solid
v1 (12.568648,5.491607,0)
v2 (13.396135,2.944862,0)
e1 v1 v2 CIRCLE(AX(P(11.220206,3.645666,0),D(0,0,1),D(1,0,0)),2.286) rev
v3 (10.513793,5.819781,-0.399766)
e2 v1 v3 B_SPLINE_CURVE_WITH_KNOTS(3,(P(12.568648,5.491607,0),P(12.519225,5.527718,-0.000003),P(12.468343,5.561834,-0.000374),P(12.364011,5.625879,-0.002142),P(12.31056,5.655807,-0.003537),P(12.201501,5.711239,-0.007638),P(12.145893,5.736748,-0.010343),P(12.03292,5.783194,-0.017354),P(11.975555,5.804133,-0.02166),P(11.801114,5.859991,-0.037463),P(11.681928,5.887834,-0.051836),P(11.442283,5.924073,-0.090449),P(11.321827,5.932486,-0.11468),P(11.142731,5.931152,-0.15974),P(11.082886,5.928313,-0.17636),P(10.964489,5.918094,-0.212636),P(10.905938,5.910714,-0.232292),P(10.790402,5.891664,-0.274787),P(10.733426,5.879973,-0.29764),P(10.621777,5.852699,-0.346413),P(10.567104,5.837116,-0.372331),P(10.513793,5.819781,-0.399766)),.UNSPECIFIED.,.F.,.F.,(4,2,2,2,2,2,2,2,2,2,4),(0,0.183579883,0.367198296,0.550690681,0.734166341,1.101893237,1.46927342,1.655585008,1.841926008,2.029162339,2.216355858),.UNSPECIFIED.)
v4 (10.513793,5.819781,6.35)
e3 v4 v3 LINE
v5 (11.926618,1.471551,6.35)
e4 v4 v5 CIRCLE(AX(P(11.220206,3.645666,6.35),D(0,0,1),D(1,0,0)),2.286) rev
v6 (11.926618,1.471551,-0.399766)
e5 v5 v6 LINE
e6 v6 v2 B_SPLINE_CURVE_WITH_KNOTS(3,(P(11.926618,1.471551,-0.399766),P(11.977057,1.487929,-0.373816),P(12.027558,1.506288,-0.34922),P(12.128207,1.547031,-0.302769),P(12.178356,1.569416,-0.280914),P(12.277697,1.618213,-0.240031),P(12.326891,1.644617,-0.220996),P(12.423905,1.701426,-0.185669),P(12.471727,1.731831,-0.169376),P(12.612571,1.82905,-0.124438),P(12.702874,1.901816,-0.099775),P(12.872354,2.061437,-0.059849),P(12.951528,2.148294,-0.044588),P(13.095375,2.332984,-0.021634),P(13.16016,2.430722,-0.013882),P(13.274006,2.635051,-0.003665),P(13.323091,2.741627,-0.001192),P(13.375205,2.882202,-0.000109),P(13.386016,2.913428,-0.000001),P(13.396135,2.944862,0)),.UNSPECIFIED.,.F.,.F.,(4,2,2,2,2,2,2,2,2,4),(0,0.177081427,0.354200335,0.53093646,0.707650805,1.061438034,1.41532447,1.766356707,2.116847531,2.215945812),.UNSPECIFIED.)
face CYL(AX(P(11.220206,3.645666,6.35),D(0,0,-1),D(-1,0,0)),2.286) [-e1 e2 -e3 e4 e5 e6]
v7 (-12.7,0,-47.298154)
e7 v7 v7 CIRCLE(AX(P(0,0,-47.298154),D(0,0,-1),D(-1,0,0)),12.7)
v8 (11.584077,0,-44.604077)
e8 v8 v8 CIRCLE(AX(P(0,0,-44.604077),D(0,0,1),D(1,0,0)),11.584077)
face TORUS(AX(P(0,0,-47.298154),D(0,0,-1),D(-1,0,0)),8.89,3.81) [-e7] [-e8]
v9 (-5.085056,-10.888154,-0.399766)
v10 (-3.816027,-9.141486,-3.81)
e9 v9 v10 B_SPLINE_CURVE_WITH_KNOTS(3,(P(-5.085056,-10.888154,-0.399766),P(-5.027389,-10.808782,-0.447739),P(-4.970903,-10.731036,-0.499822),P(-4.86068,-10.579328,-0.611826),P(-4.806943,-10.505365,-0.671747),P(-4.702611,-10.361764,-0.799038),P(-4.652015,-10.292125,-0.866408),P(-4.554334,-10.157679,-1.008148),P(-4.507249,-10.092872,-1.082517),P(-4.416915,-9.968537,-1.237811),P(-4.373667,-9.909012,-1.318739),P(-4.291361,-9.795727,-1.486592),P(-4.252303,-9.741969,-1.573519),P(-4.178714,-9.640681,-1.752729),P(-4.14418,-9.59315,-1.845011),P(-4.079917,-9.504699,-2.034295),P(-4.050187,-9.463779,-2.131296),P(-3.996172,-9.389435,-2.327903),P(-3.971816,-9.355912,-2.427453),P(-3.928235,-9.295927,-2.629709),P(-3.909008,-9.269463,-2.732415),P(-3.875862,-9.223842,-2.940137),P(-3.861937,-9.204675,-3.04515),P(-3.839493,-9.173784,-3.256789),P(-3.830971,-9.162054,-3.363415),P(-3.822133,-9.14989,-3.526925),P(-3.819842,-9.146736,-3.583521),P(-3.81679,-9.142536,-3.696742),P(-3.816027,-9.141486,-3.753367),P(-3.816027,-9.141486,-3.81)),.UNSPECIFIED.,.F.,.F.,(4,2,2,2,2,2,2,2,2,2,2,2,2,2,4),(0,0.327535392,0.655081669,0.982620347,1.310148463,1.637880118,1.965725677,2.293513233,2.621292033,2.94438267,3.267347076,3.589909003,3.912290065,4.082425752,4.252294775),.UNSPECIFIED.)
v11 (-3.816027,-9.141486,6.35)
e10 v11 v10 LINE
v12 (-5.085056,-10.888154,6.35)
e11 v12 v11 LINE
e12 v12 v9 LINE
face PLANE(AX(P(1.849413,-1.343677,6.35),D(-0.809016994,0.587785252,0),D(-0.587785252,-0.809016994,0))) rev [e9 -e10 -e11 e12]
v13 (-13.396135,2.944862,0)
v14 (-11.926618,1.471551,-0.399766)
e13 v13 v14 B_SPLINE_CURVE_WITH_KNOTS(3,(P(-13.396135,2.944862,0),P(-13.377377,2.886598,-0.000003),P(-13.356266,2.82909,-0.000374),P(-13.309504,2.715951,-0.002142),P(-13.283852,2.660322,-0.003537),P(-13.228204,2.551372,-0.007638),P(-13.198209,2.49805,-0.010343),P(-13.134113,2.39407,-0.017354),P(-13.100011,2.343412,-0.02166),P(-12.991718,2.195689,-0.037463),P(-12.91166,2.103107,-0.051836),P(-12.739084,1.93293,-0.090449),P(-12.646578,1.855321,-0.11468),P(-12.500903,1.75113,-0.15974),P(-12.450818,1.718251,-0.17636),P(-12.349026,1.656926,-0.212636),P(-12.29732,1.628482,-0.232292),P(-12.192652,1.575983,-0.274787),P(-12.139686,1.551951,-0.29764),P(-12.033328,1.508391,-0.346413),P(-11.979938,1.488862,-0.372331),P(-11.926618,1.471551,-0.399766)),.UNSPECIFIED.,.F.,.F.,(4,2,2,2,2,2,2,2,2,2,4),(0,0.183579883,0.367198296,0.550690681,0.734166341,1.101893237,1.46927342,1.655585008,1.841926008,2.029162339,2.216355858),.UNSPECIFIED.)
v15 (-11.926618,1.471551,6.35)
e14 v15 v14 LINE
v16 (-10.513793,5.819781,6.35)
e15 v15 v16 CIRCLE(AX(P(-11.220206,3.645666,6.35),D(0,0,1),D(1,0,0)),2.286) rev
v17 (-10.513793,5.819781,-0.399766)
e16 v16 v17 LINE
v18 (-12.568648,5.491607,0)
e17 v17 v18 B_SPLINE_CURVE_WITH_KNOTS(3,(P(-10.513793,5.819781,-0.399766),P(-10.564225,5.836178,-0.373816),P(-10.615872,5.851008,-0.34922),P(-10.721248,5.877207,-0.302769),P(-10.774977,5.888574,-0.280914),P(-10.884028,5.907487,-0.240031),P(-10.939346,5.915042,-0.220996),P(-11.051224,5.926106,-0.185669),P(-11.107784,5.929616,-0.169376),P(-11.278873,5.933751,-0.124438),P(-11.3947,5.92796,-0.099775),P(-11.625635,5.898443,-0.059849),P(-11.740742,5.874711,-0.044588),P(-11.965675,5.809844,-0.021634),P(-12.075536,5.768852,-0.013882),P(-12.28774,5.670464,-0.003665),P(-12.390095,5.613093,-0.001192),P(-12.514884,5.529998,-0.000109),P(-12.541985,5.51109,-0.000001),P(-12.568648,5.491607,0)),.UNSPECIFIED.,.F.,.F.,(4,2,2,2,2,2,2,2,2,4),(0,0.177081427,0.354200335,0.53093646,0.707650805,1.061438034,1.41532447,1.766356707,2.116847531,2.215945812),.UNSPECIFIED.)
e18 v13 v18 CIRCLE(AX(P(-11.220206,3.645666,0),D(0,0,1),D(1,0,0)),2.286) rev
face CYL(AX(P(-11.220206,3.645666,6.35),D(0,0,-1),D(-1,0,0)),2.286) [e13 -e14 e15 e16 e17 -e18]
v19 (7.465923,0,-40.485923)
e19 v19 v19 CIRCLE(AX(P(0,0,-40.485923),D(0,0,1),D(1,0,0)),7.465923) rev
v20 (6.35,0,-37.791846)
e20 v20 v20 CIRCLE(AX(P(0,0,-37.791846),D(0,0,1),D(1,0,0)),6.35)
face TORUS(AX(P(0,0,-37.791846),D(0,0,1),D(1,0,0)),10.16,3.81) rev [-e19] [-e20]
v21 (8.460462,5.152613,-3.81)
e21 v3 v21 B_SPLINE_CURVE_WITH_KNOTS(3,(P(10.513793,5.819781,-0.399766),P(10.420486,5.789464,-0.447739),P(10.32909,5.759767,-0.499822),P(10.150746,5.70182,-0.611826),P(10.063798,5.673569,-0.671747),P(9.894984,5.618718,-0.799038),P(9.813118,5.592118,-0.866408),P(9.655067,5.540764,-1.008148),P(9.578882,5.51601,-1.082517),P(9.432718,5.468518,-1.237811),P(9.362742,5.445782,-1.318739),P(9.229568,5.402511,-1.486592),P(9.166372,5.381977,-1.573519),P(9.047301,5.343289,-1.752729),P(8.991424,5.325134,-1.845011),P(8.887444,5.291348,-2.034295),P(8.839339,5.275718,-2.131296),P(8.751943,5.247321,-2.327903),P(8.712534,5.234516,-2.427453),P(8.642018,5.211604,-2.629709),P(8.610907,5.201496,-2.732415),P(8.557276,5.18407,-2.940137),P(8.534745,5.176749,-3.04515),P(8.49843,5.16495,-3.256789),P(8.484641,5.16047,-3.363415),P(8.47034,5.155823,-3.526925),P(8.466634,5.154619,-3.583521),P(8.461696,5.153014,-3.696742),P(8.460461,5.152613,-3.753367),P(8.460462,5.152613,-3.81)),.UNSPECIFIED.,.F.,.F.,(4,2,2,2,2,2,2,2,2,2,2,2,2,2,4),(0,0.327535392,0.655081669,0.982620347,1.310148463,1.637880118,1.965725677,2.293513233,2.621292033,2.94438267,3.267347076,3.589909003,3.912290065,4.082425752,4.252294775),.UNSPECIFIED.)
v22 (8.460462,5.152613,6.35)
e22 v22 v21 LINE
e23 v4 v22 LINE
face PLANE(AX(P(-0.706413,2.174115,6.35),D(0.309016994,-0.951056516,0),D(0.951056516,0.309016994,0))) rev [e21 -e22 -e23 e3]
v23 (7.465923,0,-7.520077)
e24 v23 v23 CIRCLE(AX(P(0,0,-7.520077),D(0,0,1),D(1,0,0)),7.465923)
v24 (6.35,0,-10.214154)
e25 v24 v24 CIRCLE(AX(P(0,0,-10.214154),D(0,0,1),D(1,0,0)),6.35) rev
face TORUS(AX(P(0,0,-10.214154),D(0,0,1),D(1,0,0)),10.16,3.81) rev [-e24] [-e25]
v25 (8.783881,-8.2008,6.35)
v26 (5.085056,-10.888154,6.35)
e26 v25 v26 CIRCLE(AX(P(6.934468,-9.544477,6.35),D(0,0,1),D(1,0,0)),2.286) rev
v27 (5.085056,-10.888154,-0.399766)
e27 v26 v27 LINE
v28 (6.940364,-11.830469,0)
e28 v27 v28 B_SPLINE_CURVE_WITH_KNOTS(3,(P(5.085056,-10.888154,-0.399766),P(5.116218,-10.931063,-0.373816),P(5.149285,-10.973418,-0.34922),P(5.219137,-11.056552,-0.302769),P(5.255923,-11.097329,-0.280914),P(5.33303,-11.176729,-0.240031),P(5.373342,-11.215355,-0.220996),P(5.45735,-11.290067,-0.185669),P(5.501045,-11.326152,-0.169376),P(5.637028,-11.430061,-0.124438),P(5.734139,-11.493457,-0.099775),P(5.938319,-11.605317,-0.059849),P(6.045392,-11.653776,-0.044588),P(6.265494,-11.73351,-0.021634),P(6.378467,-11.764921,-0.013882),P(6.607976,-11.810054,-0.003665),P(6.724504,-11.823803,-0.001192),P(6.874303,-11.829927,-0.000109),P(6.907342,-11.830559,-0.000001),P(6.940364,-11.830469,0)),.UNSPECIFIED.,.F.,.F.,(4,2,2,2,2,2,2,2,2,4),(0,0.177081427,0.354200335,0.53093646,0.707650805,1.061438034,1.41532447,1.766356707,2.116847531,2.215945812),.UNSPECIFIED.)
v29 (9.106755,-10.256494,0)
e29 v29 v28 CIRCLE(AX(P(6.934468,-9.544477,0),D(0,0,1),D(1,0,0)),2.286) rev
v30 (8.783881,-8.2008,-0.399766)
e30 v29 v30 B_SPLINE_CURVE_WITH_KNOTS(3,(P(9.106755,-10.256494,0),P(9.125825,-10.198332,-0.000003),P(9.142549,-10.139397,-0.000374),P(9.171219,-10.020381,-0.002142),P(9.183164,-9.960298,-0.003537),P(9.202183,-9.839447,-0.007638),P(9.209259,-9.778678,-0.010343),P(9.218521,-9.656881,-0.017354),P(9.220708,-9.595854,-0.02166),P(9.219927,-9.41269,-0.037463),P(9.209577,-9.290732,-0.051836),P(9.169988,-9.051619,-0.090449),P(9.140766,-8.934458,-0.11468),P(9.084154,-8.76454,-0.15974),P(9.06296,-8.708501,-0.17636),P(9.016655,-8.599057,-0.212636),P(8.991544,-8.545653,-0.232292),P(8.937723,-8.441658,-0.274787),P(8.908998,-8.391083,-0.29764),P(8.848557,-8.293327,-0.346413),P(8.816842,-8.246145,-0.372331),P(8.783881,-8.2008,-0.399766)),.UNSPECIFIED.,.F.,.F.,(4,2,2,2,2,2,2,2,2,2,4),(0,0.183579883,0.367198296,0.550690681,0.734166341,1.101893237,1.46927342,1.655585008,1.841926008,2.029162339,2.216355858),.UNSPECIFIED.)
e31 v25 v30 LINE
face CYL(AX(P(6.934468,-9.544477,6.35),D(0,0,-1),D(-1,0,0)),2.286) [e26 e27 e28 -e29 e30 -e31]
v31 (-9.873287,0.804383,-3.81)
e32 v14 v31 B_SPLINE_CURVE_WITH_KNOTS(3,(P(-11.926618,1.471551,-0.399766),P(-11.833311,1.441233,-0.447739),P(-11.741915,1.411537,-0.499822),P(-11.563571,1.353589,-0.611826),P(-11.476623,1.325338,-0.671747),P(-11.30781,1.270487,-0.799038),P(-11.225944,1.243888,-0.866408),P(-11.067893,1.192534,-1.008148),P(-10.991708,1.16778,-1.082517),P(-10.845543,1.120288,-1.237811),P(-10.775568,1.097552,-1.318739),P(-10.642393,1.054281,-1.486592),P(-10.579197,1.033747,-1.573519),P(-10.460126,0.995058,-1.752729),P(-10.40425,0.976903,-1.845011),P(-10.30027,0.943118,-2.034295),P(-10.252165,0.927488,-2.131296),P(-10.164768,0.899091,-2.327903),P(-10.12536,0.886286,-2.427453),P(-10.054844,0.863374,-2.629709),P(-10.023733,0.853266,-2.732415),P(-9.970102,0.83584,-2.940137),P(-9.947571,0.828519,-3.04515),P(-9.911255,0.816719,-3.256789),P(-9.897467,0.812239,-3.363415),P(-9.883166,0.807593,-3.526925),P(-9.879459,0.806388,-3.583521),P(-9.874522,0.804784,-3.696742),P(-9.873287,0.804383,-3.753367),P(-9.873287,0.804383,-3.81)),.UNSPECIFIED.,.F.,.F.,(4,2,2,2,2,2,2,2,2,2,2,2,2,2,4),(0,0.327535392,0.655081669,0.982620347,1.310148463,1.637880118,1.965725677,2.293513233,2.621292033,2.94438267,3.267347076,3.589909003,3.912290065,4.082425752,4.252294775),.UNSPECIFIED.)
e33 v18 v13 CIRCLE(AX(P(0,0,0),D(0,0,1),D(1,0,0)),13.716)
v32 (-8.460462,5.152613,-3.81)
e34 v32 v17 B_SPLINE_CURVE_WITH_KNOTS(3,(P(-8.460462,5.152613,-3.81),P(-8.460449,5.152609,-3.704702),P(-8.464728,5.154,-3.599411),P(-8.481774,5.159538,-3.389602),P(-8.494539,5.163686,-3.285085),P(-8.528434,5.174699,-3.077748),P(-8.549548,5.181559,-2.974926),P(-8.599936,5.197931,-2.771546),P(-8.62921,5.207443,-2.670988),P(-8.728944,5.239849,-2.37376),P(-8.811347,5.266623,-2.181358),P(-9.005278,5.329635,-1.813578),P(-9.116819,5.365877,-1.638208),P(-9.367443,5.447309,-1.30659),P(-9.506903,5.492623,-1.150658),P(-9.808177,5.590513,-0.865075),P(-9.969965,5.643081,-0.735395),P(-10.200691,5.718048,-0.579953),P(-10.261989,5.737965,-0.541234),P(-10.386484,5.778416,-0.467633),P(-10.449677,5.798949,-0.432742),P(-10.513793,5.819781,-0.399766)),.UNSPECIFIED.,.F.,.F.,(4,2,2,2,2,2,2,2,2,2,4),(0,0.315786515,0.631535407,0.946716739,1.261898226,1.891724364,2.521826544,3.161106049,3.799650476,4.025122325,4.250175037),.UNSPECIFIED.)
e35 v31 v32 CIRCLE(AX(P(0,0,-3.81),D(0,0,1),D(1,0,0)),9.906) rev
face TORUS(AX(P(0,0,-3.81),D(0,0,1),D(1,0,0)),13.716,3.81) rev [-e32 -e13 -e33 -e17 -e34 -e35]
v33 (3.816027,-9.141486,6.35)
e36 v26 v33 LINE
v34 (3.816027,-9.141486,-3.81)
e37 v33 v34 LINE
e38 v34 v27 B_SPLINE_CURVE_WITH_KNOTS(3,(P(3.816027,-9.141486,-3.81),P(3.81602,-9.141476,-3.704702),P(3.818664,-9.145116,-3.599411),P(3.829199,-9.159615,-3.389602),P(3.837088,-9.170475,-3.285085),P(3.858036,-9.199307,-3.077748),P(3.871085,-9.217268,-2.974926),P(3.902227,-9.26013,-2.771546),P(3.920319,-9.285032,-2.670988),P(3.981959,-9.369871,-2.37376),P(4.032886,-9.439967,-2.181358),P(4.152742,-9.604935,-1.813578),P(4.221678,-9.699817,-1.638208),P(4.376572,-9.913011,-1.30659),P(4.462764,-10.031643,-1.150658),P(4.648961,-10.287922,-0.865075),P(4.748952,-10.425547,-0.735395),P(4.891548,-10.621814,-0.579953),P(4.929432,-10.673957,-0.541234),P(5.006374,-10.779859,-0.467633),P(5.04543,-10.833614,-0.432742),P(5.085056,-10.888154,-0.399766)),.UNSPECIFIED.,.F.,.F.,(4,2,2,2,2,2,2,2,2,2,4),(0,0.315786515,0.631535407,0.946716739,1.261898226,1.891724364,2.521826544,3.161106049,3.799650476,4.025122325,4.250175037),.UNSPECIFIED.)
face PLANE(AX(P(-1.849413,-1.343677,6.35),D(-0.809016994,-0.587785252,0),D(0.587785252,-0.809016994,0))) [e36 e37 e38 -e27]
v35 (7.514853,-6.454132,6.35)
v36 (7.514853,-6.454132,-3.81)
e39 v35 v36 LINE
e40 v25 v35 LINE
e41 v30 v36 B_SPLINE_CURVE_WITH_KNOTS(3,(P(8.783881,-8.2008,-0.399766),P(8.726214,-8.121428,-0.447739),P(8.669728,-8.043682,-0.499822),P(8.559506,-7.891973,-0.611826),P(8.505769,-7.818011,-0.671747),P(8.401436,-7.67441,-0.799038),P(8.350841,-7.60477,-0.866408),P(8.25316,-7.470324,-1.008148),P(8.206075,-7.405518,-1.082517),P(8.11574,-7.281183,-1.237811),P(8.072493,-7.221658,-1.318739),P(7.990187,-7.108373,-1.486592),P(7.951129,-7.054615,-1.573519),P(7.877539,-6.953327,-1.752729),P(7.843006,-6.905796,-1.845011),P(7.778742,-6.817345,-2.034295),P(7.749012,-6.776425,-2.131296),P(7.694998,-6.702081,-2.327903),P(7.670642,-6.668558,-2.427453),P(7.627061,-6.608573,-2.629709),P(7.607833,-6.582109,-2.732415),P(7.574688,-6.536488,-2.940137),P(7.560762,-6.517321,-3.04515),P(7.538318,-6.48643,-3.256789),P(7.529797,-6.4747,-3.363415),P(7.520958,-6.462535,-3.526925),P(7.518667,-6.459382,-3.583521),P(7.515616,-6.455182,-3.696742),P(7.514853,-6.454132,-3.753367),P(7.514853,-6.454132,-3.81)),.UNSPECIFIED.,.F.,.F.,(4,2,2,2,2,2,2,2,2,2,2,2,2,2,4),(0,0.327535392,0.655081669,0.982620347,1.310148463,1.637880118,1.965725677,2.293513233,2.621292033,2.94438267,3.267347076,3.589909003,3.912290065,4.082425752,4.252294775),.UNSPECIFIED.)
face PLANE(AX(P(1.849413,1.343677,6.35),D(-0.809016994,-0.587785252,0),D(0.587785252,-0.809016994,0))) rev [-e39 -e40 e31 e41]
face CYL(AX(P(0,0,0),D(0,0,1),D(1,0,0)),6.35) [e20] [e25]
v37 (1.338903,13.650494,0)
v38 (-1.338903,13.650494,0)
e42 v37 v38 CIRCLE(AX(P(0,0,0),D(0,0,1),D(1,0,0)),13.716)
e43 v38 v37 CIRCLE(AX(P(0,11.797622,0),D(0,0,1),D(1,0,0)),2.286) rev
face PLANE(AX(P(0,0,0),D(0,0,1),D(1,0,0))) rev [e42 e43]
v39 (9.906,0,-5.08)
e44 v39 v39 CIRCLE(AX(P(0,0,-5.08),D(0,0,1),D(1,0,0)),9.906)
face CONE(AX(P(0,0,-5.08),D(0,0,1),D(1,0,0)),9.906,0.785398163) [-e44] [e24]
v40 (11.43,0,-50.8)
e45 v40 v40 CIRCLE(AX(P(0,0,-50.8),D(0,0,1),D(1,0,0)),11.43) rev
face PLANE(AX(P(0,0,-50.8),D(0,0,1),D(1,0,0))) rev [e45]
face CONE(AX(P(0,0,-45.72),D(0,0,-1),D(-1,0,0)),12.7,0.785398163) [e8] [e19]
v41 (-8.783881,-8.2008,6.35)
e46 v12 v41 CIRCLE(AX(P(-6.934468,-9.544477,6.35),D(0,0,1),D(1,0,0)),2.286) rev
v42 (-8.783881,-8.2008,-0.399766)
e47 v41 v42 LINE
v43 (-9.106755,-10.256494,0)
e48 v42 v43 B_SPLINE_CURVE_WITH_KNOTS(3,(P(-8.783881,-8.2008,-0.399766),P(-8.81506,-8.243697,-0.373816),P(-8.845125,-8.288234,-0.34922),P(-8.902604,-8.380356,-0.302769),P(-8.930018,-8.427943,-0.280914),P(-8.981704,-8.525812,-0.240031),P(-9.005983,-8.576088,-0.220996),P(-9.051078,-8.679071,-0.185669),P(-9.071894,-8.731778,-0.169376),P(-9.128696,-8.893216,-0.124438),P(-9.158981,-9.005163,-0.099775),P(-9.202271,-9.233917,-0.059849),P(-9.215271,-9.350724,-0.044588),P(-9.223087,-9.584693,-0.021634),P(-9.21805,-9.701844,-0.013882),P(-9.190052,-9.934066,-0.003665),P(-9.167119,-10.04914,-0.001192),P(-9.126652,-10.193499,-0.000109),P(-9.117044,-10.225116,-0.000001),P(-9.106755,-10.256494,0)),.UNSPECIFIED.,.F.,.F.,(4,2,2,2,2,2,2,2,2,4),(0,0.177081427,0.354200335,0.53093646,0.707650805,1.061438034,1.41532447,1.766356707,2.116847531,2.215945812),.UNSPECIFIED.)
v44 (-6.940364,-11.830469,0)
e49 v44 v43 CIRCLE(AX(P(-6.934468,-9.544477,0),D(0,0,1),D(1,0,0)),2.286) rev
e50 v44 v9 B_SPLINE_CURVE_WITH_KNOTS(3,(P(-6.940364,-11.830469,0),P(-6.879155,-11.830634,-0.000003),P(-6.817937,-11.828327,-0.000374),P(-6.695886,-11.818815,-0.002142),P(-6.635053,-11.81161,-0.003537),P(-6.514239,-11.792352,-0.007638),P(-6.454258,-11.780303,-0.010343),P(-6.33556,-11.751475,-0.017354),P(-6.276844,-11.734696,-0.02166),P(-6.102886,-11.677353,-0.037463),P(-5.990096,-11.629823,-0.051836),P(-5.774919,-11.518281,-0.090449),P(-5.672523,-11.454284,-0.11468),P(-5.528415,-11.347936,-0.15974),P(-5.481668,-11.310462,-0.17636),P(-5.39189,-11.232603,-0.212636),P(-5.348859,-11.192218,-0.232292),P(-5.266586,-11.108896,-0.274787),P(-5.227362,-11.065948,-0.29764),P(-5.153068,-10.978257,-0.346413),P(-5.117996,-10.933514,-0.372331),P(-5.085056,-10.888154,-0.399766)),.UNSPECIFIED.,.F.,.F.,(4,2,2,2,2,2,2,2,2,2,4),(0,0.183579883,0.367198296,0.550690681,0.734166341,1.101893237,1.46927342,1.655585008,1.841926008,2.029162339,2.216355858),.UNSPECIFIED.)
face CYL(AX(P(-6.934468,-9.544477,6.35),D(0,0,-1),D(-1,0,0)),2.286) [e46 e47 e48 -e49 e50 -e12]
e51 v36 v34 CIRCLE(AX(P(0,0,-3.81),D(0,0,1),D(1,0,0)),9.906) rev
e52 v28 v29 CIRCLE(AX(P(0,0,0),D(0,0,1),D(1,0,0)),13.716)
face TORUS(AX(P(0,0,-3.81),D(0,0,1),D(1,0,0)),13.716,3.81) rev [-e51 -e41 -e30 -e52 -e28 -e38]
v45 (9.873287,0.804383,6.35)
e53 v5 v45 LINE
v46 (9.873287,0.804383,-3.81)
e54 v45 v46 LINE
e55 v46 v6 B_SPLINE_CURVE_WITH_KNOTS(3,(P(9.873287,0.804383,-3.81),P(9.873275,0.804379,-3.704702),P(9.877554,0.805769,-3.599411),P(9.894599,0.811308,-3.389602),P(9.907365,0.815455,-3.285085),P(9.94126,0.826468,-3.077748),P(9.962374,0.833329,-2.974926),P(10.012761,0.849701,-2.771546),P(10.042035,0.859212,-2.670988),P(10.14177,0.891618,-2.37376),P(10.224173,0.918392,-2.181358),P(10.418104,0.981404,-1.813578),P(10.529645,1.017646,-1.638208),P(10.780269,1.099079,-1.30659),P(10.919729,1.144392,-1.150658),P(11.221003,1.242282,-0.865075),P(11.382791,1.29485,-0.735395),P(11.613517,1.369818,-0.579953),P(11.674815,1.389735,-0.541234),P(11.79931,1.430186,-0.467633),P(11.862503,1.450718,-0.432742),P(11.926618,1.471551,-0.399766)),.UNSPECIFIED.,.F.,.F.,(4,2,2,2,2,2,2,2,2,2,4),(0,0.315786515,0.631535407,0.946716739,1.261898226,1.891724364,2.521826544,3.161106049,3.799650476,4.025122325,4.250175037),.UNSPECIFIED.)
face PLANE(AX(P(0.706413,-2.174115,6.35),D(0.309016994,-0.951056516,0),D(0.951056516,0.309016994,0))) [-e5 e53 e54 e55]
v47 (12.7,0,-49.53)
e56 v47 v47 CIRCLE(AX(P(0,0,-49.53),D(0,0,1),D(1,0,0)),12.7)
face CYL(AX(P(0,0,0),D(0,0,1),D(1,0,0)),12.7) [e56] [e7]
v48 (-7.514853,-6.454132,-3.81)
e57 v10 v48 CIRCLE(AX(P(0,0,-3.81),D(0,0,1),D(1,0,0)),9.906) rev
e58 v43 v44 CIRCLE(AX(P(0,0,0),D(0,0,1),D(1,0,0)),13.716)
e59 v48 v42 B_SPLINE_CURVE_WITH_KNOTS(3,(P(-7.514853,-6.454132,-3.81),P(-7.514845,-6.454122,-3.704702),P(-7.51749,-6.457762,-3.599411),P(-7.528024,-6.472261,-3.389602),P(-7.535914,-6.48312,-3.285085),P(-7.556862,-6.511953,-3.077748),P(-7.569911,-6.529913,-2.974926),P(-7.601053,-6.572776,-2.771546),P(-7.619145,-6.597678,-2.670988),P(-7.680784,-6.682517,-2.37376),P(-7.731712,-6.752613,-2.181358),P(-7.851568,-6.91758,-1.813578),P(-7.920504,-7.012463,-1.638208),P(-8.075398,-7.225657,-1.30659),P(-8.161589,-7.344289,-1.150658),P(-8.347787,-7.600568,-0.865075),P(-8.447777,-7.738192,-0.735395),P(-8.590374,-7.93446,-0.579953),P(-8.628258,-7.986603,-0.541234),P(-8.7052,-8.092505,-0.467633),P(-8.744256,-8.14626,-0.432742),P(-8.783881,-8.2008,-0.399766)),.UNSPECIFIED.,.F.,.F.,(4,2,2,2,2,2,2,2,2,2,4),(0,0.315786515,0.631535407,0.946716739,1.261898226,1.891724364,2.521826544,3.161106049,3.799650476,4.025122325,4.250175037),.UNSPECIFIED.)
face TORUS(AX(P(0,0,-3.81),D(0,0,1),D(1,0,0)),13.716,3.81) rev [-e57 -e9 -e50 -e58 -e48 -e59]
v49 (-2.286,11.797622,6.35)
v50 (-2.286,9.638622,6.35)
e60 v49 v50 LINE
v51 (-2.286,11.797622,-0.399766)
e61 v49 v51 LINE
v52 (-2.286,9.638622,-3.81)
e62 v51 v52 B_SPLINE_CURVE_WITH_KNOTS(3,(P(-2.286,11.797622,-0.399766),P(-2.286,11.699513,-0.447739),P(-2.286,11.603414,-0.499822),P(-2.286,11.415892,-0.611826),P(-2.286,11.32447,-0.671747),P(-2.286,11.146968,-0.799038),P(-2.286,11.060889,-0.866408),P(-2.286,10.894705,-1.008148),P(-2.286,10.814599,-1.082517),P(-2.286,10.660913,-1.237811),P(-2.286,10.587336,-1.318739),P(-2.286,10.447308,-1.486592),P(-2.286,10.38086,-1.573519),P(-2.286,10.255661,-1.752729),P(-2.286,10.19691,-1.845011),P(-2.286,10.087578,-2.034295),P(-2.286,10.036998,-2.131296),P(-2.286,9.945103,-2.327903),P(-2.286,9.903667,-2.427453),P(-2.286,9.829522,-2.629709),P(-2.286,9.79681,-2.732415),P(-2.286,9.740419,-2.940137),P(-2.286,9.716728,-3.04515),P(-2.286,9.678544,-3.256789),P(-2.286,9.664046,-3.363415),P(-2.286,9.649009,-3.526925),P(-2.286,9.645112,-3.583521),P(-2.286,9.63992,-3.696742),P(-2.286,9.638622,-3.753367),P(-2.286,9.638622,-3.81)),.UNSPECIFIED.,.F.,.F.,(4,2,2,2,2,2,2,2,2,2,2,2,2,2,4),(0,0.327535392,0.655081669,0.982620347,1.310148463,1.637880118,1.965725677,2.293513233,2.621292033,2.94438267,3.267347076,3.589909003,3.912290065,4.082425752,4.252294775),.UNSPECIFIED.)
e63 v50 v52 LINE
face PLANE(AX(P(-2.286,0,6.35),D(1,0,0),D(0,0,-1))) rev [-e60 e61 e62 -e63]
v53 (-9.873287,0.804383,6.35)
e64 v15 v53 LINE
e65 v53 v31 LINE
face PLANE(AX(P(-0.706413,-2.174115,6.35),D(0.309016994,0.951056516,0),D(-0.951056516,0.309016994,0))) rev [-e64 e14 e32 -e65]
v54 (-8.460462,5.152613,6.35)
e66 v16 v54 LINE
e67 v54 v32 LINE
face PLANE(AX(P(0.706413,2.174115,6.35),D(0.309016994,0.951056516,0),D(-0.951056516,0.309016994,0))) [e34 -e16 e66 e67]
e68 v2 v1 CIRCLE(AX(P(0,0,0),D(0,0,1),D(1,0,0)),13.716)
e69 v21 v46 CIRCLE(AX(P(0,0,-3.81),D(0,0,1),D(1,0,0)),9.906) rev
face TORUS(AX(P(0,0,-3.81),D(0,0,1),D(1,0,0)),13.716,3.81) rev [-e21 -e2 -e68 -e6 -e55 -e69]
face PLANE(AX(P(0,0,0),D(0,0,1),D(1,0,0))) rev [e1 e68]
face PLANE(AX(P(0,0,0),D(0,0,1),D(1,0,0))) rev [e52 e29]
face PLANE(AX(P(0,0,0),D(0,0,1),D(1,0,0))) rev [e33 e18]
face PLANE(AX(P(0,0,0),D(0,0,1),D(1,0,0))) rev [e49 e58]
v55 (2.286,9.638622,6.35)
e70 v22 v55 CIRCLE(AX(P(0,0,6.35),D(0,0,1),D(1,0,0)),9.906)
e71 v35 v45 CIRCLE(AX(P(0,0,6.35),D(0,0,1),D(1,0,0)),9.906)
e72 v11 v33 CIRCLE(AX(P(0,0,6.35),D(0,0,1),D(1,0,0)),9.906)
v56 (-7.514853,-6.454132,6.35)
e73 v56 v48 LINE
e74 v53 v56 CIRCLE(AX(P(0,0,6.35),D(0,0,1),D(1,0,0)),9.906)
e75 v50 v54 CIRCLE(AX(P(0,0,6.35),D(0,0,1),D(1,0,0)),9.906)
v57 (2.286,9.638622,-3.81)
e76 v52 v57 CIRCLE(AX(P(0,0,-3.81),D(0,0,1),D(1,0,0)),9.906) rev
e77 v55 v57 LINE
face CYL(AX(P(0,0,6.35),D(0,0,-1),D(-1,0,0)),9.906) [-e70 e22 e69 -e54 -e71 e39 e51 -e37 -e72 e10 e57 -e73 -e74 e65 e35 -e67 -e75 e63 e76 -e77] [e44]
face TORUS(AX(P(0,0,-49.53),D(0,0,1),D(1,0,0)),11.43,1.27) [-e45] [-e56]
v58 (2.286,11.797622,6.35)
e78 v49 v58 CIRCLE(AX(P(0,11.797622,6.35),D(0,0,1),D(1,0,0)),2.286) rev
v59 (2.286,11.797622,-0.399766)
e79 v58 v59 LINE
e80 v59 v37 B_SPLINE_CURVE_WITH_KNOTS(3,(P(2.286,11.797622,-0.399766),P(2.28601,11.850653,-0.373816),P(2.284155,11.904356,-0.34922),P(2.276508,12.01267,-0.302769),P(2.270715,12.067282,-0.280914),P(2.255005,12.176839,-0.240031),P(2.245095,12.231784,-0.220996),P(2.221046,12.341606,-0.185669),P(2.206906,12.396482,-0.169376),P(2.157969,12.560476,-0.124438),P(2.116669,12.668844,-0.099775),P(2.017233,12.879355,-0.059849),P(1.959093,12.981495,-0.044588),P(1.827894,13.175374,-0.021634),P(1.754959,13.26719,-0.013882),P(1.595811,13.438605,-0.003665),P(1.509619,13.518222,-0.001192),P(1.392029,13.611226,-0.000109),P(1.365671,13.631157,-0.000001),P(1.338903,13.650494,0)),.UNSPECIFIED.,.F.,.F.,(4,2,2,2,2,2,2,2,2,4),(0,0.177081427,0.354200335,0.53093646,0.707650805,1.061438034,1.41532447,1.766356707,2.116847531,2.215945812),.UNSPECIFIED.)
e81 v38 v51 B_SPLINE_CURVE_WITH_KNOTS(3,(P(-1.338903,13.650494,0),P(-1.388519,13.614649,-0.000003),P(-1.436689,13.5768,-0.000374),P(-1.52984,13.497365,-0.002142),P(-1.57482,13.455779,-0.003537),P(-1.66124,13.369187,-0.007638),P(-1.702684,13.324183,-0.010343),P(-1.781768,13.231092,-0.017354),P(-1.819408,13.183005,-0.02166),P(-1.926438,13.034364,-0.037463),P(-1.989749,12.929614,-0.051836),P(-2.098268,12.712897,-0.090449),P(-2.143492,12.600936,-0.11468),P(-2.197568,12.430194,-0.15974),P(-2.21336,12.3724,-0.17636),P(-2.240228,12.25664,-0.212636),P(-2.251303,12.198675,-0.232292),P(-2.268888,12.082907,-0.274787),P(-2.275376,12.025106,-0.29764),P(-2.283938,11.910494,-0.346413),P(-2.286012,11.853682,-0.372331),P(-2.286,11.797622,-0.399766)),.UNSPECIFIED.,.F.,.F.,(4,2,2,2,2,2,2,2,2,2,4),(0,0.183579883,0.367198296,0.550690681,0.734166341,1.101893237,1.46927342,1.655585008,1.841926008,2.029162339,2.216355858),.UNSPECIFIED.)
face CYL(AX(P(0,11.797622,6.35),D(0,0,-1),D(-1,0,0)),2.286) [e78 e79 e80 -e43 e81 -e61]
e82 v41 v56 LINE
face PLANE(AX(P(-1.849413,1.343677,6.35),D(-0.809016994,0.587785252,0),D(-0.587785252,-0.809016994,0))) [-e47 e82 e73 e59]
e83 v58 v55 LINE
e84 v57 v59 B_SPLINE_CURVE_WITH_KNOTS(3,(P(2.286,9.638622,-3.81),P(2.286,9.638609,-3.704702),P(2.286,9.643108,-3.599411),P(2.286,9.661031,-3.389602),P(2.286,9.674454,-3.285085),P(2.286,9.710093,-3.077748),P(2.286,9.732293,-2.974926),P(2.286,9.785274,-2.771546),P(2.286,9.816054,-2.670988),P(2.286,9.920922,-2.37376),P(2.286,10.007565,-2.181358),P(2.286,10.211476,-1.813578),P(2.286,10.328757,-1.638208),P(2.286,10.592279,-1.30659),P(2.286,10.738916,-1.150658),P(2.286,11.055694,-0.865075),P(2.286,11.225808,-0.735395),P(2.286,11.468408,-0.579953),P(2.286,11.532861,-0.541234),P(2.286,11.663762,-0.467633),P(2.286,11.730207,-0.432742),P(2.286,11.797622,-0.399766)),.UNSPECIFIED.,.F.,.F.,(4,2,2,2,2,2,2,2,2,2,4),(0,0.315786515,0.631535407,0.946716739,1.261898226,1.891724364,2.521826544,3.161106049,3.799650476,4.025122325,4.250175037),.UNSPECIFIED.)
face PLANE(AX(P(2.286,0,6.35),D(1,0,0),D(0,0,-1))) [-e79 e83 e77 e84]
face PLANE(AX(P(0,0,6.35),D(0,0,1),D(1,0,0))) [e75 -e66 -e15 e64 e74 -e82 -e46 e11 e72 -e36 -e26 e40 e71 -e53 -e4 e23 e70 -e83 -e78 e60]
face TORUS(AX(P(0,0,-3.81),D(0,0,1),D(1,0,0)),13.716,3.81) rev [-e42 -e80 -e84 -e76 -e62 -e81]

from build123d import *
from build123d.topology import SkipClean

# Parameters (mm, degrees)
SKETCH1_R           = 9.906
BOSS_EXTRUDE1_DEPTH = 6.35
FILLET1_START       = -3.8100001
FILLET1_3_DEPTH     = 3.8100001
FILLET2_R           = 1.27


with BuildPart() as part:
    # Sketch1 → Boss-Extrude1 (new body)
    with BuildSketch(Plane.XY):
        with BuildLine():
            ThreePointArc((-9.873287403, 0.804382899), (-9.42116585, 3.061122346), (-8.460461705, 5.152613292))
            Line((-8.460461705, 5.152613292), (-10.513792724, 5.819780983))
            ThreePointArc((-10.513792724, 5.819780983), (-13.394320769, 4.352078636), (-11.926618422, 1.47155059))
            Line((-11.926618422, 1.47155059), (-9.873287403, 0.804382899))
        make_face()
        Circle(SKETCH1_R)
        with BuildLine():
            Line((-5.085055556, -10.888154027), (-3.816027196, -9.141486336))
            ThreePointArc((-3.816027196, -9.141486336), (-5.822600709, -8.014122346), (-7.514852894, -6.454132163))
            Line((-7.514852894, -6.454132163), (-8.783881254, -8.200799854))
            ThreePointArc((-8.783881254, -8.200799854), (-8.278145492, -11.39388979), (-5.085055556, -10.888154027))
        make_face()
        with BuildLine():
            Line((8.783881254, -8.200799854), (7.514852894, -6.454132163))
            ThreePointArc((7.514852894, -6.454132163), (5.822600709, -8.014122346), (3.816027196, -9.141486336))
            Line((3.816027196, -9.141486336), (5.085055556, -10.888154027))
            ThreePointArc((5.085055556, -10.888154027), (8.278145492, -11.39388979), (8.783881254, -8.200799854))
        make_face()
        with BuildLine():
            Line((9.873287403, 0.804382899), (11.926618422, 1.47155059))
            ThreePointArc((11.926618422, 1.47155059), (13.394320769, 4.352078636), (10.513792724, 5.819780983))
            Line((10.513792724, 5.819780983), (8.460461705, 5.152613292))
            ThreePointArc((8.460461705, 5.152613292), (9.42116585, 3.061122346), (9.873287403, 0.804382899))
        make_face()
        with BuildLine():
            ThreePointArc((-2.286, 9.638622308), (0, 9.906), (2.286, 9.638622308))
            Line((2.286, 9.638622308), (2.286, 11.797622308))
            ThreePointArc((2.286, 11.797622308), (0, 14.083622308), (-2.286, 11.797622308))
            Line((-2.286, 11.797622308), (-2.286, 9.638622308))
        make_face()
    extrude(amount=BOSS_EXTRUDE1_DEPTH)

    # Sketch2 → Revolve1 (revolve)
    with SkipClean():  # the faces are left unmerged after this step: merging them gives an invalid solid
        with BuildSketch(Plane(origin=(0, 0, 0), x_dir=(1, 0, 0), z_dir=(0, 1, 0))):
            Polygon((0, 50.8), (0, 0), (9.906, 0), (9.906, 5.08), (6.35, 8.636), (6.35, 39.37), (12.7, 45.72), (12.7, 50.8), align=None)
        revolve(axis=Axis((0, 0, 0), (0, 0, -1)))
    add(part.part.scale(1), mode=Mode.REPLACE)  # the faces are merged on a copy

    # Fillet1: read off the stored shape, not the designer's step
    # Fillet1 outline → Fillet1 (revolve, cut)
    with BuildSketch(Plane.XZ):
        with BuildLine():
            Line((12.7, -44.604076836), (11.584076836, -44.604076836))
            ThreePointArc((11.584076836, -44.604076836), (12.409981019, -45.840129795), (12.7, -47.298153673))
            Line((12.7, -47.298153673), (12.7, -44.604076836))
        make_face()
    revolve(axis=Axis((0, 0, 0), (0, 0, 1)), mode=Mode.SUBTRACT)

    # Fillet1 2 outline → Fillet1 2 (revolve)
    with BuildSketch(Plane.XZ):
        with BuildLine():
            Line((6.35, -40.485923164), (7.465923164, -40.485923164))
            ThreePointArc((7.465923164, -40.485923164), (6.640018981, -39.249870205), (6.35, -37.791846327))
            Line((6.35, -37.791846327), (6.35, -40.485923164))
        make_face()
        with BuildLine():
            Line((6.35, -7.520076836), (6.35, -10.214153673))
            ThreePointArc((6.35, -10.214153673), (6.640018981, -8.756129795), (7.465923164, -7.520076836))
            Line((7.465923164, -7.520076836), (6.35, -7.520076836))
        make_face()
    revolve(axis=Axis((0, 0, 0), (0, 0, 1)))

    # Fillet1 3 outline → Fillet1 3 (add)
    with BuildSketch(Plane.XY.offset(FILLET1_START)):
        with BuildLine():
            Line((-11.926618422, 1.47155059), (-9.873287403, 0.804382899))
            ThreePointArc((-9.873287403, 0.804382899), (-9.42116585, 3.061122346), (-8.460461705, 5.152613292))
            Line((-8.460461705, 5.152613292), (-10.513792724, 5.819780983))
            ThreePointArc((-10.513792724, 5.819780983), (-13.394320769, 4.352078635), (-11.926618422, 1.47155059))
        make_face()
        with BuildLine():
            ThreePointArc((-3.816027196, -9.141486336), (-5.822600709, -8.014122346), (-7.514852894, -6.454132163))
            Line((-7.514852894, -6.454132163), (-8.783881254, -8.200799854))
            ThreePointArc((-8.783881254, -8.200799854), (-8.278145492, -11.39388979), (-5.085055556, -10.888154027))
            Line((-5.085055556, -10.888154027), (-3.816027196, -9.141486336))
        make_face()
        with BuildLine():
            Line((-2.286, 11.797622308), (-2.286, 9.638622308))
            ThreePointArc((-2.286, 9.638622308), (0, 9.906), (2.286, 9.638622308))
            Line((2.286, 9.638622308), (2.286, 11.797622308))
            ThreePointArc((2.286, 11.797622308), (0, 14.083622308), (-2.286, 11.797622308))
        make_face()
        with BuildLine():
            ThreePointArc((7.514852894, -6.454132163), (5.822600709, -8.014122346), (3.816027196, -9.141486336))
            Line((3.816027196, -9.141486336), (5.085055556, -10.888154027))
            ThreePointArc((5.085055556, -10.888154027), (8.278145492, -11.39388979), (8.783881254, -8.200799854))
            Line((8.783881254, -8.200799854), (7.514852894, -6.454132163))
        make_face()
        with BuildLine():
            Line((10.513792724, 5.819780983), (8.460461705, 5.152613292))
            ThreePointArc((8.460461705, 5.152613292), (9.42116585, 3.061122346), (9.873287403, 0.804382899))
            Line((9.873287403, 0.804382899), (11.926618422, 1.47155059))
            ThreePointArc((11.926618422, 1.47155059), (13.394320769, 4.352078635), (10.513792724, 5.819780983))
        make_face()
    extrude(amount=FILLET1_3_DEPTH)

    # Fillet1 4 outline → Fillet1 4 (revolve, cut)
    with BuildSketch(Plane.XZ):
        with BuildLine():
            Line((14.083622308, 0), (13.716, 0))
            ThreePointArc((13.716, 0), (11.021923164, -1.115923164), (9.906, -3.81))
            Line((9.906, -3.81), (14.083622308, -3.8100001))
            Line((14.083622308, -3.8100001), (14.083622308, 0))
        make_face()
    revolve(axis=Axis((0, 0, 0), (0, 0, 1)), mode=Mode.SUBTRACT)

    # Fillet2
    fillet2_edges = [part.edges().sort_by_distance(p)[0] for p in [
        (-12.7, 0, -50.8),
    ]]
    fillet(fillet2_edges, radius=FILLET2_R)


solid = part.part
